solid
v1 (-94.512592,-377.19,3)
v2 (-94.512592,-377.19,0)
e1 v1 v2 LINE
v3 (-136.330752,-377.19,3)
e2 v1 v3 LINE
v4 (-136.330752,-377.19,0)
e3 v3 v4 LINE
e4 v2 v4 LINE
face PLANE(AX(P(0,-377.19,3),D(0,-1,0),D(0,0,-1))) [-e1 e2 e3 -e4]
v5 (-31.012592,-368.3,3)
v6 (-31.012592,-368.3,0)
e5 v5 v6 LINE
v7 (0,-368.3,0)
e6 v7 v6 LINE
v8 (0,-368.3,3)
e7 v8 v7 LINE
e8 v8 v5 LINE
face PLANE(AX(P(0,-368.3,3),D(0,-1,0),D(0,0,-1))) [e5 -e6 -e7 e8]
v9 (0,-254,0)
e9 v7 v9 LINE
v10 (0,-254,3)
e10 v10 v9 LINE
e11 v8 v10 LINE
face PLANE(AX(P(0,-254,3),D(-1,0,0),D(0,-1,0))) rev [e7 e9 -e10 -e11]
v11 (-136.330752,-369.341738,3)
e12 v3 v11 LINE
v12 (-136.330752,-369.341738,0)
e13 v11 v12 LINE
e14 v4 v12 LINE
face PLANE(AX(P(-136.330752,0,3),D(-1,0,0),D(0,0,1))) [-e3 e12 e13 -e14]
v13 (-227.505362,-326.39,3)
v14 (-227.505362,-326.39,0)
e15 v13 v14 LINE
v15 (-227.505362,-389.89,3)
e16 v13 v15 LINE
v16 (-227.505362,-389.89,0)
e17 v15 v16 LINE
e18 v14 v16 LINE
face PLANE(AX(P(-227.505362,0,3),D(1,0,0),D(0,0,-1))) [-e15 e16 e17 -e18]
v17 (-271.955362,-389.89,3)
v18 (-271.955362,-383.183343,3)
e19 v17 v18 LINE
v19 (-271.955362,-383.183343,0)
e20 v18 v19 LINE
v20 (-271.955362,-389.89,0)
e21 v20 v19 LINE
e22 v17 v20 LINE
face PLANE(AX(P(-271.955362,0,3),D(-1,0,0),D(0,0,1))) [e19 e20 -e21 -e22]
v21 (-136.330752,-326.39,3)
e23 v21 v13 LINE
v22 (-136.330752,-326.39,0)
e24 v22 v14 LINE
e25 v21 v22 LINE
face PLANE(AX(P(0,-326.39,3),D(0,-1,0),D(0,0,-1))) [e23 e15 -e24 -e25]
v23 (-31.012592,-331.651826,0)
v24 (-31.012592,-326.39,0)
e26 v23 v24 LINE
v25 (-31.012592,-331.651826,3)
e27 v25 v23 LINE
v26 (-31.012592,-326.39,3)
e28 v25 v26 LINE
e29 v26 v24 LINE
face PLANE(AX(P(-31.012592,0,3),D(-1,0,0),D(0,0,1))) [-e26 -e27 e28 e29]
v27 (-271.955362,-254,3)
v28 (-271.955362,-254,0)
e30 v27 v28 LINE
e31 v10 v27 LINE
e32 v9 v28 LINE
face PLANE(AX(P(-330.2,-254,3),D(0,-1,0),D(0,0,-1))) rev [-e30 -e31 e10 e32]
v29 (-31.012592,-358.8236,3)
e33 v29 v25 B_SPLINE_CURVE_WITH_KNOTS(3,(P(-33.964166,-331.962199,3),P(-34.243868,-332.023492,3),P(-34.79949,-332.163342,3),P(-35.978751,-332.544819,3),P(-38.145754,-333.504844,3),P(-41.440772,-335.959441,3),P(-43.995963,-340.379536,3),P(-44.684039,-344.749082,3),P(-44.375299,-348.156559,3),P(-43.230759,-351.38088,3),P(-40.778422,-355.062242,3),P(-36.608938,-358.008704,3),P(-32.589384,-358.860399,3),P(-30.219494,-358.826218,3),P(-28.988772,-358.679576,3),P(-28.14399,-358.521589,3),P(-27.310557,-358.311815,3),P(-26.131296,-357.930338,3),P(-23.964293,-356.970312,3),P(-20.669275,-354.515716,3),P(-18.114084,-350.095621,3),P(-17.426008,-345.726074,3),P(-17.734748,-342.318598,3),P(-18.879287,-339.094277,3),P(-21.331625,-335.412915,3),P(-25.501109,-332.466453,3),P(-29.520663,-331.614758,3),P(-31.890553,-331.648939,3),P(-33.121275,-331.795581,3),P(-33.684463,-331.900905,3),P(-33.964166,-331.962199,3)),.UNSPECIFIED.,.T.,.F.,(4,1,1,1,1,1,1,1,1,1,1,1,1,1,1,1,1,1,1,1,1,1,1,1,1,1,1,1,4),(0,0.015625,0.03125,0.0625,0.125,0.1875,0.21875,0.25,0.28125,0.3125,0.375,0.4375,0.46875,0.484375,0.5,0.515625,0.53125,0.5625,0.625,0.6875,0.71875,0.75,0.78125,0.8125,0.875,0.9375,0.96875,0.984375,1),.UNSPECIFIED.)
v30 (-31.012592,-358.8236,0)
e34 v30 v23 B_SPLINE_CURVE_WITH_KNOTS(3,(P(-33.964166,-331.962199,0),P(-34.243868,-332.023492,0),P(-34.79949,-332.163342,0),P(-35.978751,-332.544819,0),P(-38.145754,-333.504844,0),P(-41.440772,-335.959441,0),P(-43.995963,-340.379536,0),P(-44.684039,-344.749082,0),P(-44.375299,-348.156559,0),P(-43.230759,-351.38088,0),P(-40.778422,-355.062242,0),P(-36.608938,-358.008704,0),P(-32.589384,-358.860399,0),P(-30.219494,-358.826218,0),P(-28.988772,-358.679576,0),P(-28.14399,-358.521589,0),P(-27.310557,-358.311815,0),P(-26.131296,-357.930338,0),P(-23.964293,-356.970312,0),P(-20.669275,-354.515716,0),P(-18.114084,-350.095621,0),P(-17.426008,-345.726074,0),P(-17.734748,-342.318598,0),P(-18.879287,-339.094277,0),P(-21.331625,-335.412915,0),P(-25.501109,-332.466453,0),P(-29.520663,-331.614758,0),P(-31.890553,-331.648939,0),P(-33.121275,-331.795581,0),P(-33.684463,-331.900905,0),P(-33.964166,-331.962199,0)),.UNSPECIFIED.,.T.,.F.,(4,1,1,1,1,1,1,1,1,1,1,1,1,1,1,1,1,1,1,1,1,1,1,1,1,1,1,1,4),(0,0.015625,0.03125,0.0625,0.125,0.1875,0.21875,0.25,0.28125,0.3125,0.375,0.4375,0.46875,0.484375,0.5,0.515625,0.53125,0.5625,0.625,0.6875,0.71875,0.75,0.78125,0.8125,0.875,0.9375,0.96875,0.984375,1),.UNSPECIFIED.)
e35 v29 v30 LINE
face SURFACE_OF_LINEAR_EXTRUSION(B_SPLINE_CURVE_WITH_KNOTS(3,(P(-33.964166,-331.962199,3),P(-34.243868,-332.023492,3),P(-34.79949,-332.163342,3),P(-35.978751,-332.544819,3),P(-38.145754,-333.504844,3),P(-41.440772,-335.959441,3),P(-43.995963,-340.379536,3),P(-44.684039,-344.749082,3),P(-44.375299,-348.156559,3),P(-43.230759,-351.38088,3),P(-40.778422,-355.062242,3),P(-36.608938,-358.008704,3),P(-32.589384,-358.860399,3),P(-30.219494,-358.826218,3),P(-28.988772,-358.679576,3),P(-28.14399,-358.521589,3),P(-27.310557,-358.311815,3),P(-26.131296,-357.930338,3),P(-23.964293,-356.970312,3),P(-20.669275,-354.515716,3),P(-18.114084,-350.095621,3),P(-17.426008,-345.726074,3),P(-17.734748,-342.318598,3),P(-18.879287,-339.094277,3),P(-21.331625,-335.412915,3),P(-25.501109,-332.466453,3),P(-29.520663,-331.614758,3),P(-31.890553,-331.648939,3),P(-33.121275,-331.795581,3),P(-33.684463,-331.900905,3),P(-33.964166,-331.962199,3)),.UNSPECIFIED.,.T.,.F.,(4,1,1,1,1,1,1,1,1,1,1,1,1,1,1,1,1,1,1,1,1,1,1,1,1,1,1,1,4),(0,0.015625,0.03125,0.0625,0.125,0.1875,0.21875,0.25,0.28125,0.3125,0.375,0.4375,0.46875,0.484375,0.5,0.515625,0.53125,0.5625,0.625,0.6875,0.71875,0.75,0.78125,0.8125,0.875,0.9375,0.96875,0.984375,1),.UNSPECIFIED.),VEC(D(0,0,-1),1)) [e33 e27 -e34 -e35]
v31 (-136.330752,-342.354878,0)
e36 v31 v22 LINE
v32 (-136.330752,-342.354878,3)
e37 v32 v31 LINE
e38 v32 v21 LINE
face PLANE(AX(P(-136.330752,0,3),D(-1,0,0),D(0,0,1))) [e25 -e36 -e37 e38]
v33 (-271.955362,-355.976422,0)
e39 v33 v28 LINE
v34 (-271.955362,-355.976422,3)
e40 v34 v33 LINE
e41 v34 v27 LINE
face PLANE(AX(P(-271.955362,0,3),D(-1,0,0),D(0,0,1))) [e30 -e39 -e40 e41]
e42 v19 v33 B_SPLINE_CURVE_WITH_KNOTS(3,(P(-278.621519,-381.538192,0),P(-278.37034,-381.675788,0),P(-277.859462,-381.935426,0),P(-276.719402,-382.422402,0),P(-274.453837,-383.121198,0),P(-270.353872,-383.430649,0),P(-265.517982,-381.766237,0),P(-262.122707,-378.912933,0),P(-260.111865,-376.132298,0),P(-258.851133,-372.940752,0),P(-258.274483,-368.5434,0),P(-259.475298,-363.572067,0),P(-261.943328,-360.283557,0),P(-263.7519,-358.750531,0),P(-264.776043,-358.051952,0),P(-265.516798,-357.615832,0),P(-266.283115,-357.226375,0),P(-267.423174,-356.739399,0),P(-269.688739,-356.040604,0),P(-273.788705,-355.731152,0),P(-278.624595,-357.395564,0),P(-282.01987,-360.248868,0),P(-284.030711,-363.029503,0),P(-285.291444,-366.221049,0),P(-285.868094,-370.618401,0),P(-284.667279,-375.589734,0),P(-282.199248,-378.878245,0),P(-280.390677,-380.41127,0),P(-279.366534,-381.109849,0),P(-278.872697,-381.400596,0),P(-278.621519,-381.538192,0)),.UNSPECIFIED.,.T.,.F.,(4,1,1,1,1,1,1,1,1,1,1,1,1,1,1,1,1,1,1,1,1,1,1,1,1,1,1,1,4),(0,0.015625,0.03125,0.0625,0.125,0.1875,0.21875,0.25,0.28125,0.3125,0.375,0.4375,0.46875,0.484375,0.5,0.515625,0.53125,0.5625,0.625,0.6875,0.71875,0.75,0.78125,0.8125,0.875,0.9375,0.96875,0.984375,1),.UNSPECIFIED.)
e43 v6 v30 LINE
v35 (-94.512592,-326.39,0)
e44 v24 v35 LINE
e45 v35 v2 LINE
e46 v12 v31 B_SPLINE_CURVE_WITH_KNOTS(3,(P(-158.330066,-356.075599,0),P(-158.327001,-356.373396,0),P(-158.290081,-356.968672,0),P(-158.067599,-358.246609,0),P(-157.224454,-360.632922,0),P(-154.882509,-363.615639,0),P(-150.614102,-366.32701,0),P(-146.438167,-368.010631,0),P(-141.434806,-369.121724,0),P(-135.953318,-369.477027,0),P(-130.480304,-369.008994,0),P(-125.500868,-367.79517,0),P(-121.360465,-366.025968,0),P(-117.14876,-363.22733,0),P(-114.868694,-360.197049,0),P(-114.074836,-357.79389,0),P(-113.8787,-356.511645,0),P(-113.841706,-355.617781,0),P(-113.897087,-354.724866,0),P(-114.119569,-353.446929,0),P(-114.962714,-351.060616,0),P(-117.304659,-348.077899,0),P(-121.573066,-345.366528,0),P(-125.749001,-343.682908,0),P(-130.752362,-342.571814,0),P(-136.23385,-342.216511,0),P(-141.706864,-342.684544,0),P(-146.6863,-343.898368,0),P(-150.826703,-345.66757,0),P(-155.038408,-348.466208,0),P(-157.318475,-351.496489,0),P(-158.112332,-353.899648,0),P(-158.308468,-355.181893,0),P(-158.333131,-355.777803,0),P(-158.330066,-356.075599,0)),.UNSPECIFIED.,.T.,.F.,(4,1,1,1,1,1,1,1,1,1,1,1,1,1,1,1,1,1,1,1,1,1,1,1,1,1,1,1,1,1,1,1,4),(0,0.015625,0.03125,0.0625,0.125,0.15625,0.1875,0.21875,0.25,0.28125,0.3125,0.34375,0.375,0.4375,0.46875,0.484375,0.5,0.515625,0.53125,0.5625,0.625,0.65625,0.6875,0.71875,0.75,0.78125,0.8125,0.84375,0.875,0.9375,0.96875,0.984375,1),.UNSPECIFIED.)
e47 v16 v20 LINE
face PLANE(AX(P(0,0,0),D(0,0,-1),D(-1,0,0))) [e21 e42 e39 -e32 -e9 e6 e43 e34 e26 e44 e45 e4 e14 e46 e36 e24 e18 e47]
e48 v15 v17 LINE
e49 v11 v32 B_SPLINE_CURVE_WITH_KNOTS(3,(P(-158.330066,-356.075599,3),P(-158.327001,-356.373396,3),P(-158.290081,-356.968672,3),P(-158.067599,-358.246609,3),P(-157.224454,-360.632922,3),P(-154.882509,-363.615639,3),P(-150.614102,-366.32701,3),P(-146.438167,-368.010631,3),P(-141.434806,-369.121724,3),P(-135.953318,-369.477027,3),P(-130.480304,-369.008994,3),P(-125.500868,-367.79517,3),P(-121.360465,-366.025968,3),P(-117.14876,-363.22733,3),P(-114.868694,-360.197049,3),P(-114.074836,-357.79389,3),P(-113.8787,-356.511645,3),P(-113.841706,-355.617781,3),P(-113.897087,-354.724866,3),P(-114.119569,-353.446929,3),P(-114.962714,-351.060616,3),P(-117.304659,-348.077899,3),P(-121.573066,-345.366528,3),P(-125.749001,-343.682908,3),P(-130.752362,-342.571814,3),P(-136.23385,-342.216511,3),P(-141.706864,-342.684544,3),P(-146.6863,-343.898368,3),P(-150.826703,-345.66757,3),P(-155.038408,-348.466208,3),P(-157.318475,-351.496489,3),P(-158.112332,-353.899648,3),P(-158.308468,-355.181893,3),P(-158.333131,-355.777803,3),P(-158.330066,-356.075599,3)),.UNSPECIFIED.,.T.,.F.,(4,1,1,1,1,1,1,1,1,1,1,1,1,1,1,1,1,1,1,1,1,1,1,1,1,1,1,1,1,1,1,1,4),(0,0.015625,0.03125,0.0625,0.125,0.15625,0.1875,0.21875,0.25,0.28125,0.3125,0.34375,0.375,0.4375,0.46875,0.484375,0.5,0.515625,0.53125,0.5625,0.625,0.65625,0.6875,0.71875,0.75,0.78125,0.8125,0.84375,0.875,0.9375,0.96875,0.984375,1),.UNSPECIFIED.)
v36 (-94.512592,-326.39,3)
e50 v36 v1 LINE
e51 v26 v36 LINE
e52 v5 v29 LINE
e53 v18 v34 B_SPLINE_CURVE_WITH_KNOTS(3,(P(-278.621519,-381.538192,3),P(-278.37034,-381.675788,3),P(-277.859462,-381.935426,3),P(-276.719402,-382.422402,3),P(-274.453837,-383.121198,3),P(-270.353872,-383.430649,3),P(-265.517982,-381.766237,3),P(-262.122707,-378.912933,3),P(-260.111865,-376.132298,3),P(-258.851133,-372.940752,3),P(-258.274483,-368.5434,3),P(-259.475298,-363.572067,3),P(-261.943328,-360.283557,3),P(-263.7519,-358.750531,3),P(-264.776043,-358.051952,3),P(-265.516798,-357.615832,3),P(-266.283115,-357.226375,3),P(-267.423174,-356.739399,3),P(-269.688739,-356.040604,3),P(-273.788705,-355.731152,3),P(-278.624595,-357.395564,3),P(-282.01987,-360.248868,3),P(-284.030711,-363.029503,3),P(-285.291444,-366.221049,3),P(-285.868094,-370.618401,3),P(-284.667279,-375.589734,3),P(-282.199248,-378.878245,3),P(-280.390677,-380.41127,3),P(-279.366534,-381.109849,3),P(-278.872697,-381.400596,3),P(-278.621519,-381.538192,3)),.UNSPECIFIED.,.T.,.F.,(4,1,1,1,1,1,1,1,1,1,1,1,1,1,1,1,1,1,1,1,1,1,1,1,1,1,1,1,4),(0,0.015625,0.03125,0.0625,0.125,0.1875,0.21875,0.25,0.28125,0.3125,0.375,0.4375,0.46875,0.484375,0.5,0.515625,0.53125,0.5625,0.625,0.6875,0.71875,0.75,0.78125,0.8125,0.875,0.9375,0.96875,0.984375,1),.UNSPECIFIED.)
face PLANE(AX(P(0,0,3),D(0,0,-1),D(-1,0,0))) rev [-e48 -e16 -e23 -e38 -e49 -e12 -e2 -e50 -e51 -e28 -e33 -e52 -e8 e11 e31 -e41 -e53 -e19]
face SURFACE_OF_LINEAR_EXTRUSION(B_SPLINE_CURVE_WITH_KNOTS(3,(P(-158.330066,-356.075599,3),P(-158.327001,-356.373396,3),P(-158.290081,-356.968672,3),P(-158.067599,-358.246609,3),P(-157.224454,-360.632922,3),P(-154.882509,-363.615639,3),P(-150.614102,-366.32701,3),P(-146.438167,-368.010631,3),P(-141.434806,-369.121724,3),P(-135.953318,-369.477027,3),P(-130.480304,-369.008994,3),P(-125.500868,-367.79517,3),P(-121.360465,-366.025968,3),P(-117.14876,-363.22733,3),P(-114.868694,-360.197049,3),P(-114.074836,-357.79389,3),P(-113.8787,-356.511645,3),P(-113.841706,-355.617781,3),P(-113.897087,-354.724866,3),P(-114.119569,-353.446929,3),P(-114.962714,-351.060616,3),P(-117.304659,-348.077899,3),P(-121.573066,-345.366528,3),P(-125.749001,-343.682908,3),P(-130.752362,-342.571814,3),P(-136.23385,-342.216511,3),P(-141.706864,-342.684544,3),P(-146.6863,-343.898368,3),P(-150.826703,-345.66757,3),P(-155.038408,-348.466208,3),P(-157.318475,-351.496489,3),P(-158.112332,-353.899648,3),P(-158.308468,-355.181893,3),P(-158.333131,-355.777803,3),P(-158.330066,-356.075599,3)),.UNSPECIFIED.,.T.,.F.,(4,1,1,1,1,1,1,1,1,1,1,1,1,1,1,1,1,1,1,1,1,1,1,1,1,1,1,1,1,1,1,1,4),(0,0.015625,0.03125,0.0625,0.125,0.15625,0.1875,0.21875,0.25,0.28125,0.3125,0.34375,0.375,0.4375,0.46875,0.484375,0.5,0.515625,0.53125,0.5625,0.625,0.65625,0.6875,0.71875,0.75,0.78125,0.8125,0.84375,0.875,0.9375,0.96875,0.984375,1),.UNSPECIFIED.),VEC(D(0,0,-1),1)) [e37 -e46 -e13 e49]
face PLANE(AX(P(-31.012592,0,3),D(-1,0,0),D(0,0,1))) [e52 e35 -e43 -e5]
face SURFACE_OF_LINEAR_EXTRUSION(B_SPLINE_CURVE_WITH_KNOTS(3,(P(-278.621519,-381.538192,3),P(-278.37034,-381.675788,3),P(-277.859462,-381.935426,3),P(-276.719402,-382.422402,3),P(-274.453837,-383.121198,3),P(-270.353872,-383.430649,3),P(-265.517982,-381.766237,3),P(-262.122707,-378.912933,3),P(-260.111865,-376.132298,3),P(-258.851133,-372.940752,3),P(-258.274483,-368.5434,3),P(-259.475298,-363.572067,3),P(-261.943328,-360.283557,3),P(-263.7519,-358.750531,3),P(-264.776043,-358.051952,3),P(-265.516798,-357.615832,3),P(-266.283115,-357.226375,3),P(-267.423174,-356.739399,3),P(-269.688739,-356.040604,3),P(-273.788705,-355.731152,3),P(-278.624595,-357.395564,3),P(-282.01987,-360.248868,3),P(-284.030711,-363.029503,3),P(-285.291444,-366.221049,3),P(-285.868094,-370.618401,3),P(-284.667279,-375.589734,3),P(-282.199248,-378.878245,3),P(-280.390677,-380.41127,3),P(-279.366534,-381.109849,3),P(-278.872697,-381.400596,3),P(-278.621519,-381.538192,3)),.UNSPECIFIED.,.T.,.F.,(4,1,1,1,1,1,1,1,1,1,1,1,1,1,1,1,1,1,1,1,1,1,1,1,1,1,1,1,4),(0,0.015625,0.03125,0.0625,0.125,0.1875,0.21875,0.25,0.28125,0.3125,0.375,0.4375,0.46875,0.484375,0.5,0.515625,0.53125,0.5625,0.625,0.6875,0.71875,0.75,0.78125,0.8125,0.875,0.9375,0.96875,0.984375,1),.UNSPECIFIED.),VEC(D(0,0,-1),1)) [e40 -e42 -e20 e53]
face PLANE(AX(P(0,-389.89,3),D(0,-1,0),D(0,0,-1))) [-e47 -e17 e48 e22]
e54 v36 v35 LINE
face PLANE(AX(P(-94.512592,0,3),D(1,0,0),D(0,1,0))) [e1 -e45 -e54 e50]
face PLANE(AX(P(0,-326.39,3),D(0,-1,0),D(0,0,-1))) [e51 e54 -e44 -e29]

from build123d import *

# Parameters (mm, degrees)
BOSS_EXTRUDE3_OUTLINE_W = 330.2
BOSS_EXTRUDE3_OUTLINE_H = 190.5
BOSS_EXTRUDE3_DEPTH     = 3
CUT_EXTRUDE2_DEPTH      = 554.733952504


# Read off the part's stored shape, not the designer's step: Boss-Extrude3
with BuildPart() as part:
    # Boss-Extrude3 outline → Boss-Extrude3 (new body)
    with BuildSketch(Plane.XY):
        with Locations((-165.1, -349.25)):
            Rectangle(BOSS_EXTRUDE3_OUTLINE_W, BOSS_EXTRUDE3_OUTLINE_H)
        with BuildLine():
            add(Edge.make_bspline(
                [(-278.621518652, -381.53819229), (-278.370340025, -381.675788485), (-277.859461829, -381.935426093), (-276.719402462, -382.422402226), (-274.453837446, -383.121197535), (-270.353871795, -383.430649395), (-265.517981506, -381.766237097), (-262.122707267, -378.912933368), (-260.111865445, -376.132298445), (-258.851133292, -372.940751822), (-258.274482706, -368.543399957), (-259.475297643, -363.572067472), (-261.943328375, -360.2835567), (-263.751900196, -358.750531033), (-264.776043253, -358.051952395), (-265.516797717, -357.615831636), (-266.283115012, -357.226375224), (-267.423174378, -356.739399091), (-269.688739395, -356.040603782), (-273.788705045, -355.731151923), (-278.624595335, -357.395564221), (-282.019869573, -360.248867949), (-284.030711396, -363.029502872), (-285.291443548, -366.221049495), (-285.868094135, -370.61840136), (-284.667279197, -375.589733845), (-282.199248466, -378.878244617), (-280.390676644, -380.411270284), (-279.366533588, -381.109848922), (-278.872697278, -381.400596095), (-278.621518652, -381.53819229)],
                knots=[0, 0, 0, 0, 0.015625, 0.03125, 0.0625, 0.125, 0.1875, 0.21875, 0.25, 0.28125, 0.3125, 0.375, 0.4375, 0.46875, 0.484375, 0.5, 0.515625, 0.53125, 0.5625, 0.625, 0.6875, 0.71875, 0.75, 0.78125, 0.8125, 0.875, 0.9375, 0.96875, 0.984375, 1, 1, 1, 1], degree=3))
        make_face(mode=Mode.SUBTRACT)
        with BuildLine():
            add(Edge.make_bspline(
                [(-158.330065967, -356.075599307), (-158.327001416, -356.373395786), (-158.290080957, -356.968671877), (-158.067598918, -358.246608867), (-157.224453748, -360.63292192), (-154.882508758, -363.615638807), (-150.614101822, -366.327010398), (-146.438166973, -368.010630749), (-141.434805852, -369.121724295), (-135.953318408, -369.477027412), (-130.480303716, -369.0089942), (-125.500867751, -367.795170138), (-121.360465048, -366.025968397), (-117.148760273, -363.227330056), (-114.868693567, -360.19704918), (-114.074835681, -357.79389013), (-113.878699845, -356.511645246), (-113.84170646, -355.617780511), (-113.897087149, -354.724866375), (-114.119569188, -353.446929384), (-114.962714357, -351.060616332), (-117.304659348, -348.077899444), (-121.573066284, -345.366527853), (-125.749001132, -343.682907503), (-130.752362254, -342.571813956), (-136.233849698, -342.216510839), (-141.70686439, -342.684544051), (-146.686300354, -343.898368114), (-150.826703058, -345.667569854), (-155.038407833, -348.466208196), (-157.318474538, -351.496489072), (-158.112332425, -353.899648121), (-158.30846826, -355.181893006), (-158.333130517, -355.777802829), (-158.330065967, -356.075599307)],
                knots=[0, 0, 0, 0, 0.015625, 0.03125, 0.0625, 0.125, 0.15625, 0.1875, 0.21875, 0.25, 0.28125, 0.3125, 0.34375, 0.375, 0.4375, 0.46875, 0.484375, 0.5, 0.515625, 0.53125, 0.5625, 0.625, 0.65625, 0.6875, 0.71875, 0.75, 0.78125, 0.8125, 0.84375, 0.875, 0.9375, 0.96875, 0.984375, 1, 1, 1, 1], degree=3))
        make_face(mode=Mode.SUBTRACT)
        with BuildLine():
            add(Edge.make_bspline(
                [(-33.964165547, -331.962198832), (-34.243868077, -332.023492326), (-34.799490244, -332.1633419), (-35.978750805, -332.544818645), (-38.145753578, -333.504844289), (-41.440772349, -335.959441018), (-43.995962688, -340.379536121), (-44.684039348, -344.749082337), (-44.375298942, -348.156558861), (-43.230759499, -351.380879931), (-40.778421797, -355.062241557), (-36.608937685, -358.008703948), (-32.589384281, -358.86039887), (-30.219493581, -358.826218077), (-28.988771838, -358.679575761), (-28.143989915, -358.521589154), (-27.310556664, -358.311814794), (-26.131296103, -357.930338049), (-23.96429333, -356.970312405), (-20.669274558, -354.515715676), (-18.11408422, -350.095620573), (-17.42600756, -345.726074356), (-17.734747965, -342.318597833), (-18.879287408, -339.094276763), (-21.331625111, -335.412915137), (-25.501109223, -332.466452745), (-29.520662627, -331.614757823), (-31.890553327, -331.648938617), (-33.121275069, -331.795580933), (-33.684463018, -331.900905337), (-33.964165547, -331.962198832)],
                knots=[0, 0, 0, 0, 0.015625, 0.03125, 0.0625, 0.125, 0.1875, 0.21875, 0.25, 0.28125, 0.3125, 0.375, 0.4375, 0.46875, 0.484375, 0.5, 0.515625, 0.53125, 0.5625, 0.625, 0.6875, 0.71875, 0.75, 0.78125, 0.8125, 0.875, 0.9375, 0.96875, 0.984375, 1, 1, 1, 1], degree=3))
        make_face(mode=Mode.SUBTRACT)
    extrude(amount=BOSS_EXTRUDE3_DEPTH)

    # Sketch9 → Cut-Extrude2 (cut, through all)
    with BuildSketch(Plane(origin=(0, 0, 0), x_dir=(-1, 0, 0), z_dir=(0, 0, -1))):
        with BuildLine():
            Line((0, -444.5), (330.2, -444.5))
            Line((330.2, -444.5), (330.2, -254))
            Line((330.2, -254), (271.955362236, -254))
            Line((271.955362236, -254), (271.955362236, -355.976421692))
            add(Edge.make_bspline(
                [(271.955362236, -355.976421692), (272.59093246, -355.976421692), (274.983557944, -356.142395301), (278.624595335, -357.395564221), (282.019869573, -360.248867949), (284.030711396, -363.029502872), (285.291443548, -366.221049495), (285.868094135, -370.61840136), (284.667279197, -375.589733845), (282.199248466, -378.878244617), (280.390676644, -380.411270284), (279.366533588, -381.109848922), (278.872697278, -381.400596095), (278.621518652, -381.53819229)],
                knots=[0.601106286, 0.601106286, 0.601106286, 0.601106286, 0.625, 0.6875, 0.71875, 0.75, 0.78125, 0.8125, 0.875, 0.9375, 0.96875, 0.984375, 1, 1, 1, 1], degree=3))
            add(Edge.make_bspline(
                [(278.621518652, -381.53819229), (278.370340025, -381.675788485), (277.859461829, -381.935426093), (276.719402462, -382.422402226), (274.88887928, -382.98701238), (273.070063108, -383.202935147), (271.955362236, -383.183342538)],
                knots=[0, 0, 0, 0, 0.015625, 0.03125, 0.0625, 0.103997424, 0.103997424, 0.103997424, 0.103997424], degree=3))
            Line((271.955362236, -383.183342538), (271.955362236, -389.89))
            Line((271.955362236, -389.89), (227.505362236, -389.89))
            Line((227.505362236, -389.89), (227.505362236, -326.39))
            Line((227.505362236, -326.39), (136.330752091, -326.39))
            Line((136.330752091, -326.39), (136.330752091, -342.354877875))
            add(Edge.make_bspline(
                [(136.330752091, -342.354877875), (138.123654962, -342.378162739), (141.736657922, -342.691806742), (146.686300354, -343.898368114), (150.826703058, -345.667569854), (155.038407833, -348.466208196), (157.318474538, -351.496489072), (158.112332425, -353.899648121), (158.30846826, -355.181893006), (158.333130517, -355.777802829), (158.330065967, -356.075599307)],
                knots=[0.750560936, 0.750560936, 0.750560936, 0.750560936, 0.78125, 0.8125, 0.84375, 0.875, 0.9375, 0.96875, 0.984375, 1, 1, 1, 1], degree=3))
            add(Edge.make_bspline(
                [(158.330065967, -356.075599307), (158.327001416, -356.373395786), (158.290080957, -356.968671877), (158.067598918, -358.246608867), (157.224453748, -360.63292192), (154.882508758, -363.615638807), (150.614101822, -366.327010398), (146.438166973, -368.010630749), (141.549303862, -369.096297788), (138.03098442, -369.341737675), (136.330752091, -369.341737675)],
                knots=[0, 0, 0, 0, 0.015625, 0.03125, 0.0625, 0.125, 0.15625, 0.1875, 0.21875, 0.247854605, 0.247854605, 0.247854605, 0.247854605], degree=3))
            Line((136.330752091, -369.341737675), (136.330752091, -377.19))
            Line((136.330752091, -377.19), (94.512592051, -377.19))
            Line((94.512592051, -377.19), (94.512592051, -326.39))
            Line((94.512592051, -326.39), (31.012592051, -326.39))
            Line((31.012592051, -326.39), (31.012592051, -331.651825694))
            add(Edge.make_bspline(
                [(31.012592051, -331.651825694), (31.419012916, -331.649248653), (32.140901517, -331.678767974), (33.121275069, -331.795580933), (33.684463018, -331.900905337), (33.964165547, -331.962198832)],
                knots=[0.950213485, 0.950213485, 0.950213485, 0.950213485, 0.96875, 0.984375, 1, 1, 1, 1], degree=3))
            add(Edge.make_bspline(
                [(33.964165547, -331.962198832), (34.243868077, -332.023492326), (34.799490244, -332.1633419), (35.978750805, -332.544818645), (38.145753578, -333.504844289), (41.440772349, -335.959441018), (43.995962688, -340.379536121), (44.684039348, -344.749082337), (44.375298942, -348.156558861), (43.230759499, -351.380879931), (40.778421797, -355.062241557), (36.608937685, -358.008703948), (33.032964836, -358.766409497), (31.318148935, -358.823600105), (31.012592051, -358.823600105)],
                knots=[0, 0, 0, 0, 0.015625, 0.03125, 0.0625, 0.125, 0.1875, 0.21875, 0.25, 0.28125, 0.3125, 0.375, 0.4375, 0.451506925, 0.451506925, 0.451506925, 0.451506925], degree=3))
            Line((31.012592051, -358.823600105), (31.012592051, -368.3))
            Line((31.012592051, -368.3), (0, -368.3))
            Line((0, -368.3), (0, -444.5))
        make_face()
    extrude(amount=-CUT_EXTRUDE2_DEPTH, mode=Mode.SUBTRACT)


solid = part.part
